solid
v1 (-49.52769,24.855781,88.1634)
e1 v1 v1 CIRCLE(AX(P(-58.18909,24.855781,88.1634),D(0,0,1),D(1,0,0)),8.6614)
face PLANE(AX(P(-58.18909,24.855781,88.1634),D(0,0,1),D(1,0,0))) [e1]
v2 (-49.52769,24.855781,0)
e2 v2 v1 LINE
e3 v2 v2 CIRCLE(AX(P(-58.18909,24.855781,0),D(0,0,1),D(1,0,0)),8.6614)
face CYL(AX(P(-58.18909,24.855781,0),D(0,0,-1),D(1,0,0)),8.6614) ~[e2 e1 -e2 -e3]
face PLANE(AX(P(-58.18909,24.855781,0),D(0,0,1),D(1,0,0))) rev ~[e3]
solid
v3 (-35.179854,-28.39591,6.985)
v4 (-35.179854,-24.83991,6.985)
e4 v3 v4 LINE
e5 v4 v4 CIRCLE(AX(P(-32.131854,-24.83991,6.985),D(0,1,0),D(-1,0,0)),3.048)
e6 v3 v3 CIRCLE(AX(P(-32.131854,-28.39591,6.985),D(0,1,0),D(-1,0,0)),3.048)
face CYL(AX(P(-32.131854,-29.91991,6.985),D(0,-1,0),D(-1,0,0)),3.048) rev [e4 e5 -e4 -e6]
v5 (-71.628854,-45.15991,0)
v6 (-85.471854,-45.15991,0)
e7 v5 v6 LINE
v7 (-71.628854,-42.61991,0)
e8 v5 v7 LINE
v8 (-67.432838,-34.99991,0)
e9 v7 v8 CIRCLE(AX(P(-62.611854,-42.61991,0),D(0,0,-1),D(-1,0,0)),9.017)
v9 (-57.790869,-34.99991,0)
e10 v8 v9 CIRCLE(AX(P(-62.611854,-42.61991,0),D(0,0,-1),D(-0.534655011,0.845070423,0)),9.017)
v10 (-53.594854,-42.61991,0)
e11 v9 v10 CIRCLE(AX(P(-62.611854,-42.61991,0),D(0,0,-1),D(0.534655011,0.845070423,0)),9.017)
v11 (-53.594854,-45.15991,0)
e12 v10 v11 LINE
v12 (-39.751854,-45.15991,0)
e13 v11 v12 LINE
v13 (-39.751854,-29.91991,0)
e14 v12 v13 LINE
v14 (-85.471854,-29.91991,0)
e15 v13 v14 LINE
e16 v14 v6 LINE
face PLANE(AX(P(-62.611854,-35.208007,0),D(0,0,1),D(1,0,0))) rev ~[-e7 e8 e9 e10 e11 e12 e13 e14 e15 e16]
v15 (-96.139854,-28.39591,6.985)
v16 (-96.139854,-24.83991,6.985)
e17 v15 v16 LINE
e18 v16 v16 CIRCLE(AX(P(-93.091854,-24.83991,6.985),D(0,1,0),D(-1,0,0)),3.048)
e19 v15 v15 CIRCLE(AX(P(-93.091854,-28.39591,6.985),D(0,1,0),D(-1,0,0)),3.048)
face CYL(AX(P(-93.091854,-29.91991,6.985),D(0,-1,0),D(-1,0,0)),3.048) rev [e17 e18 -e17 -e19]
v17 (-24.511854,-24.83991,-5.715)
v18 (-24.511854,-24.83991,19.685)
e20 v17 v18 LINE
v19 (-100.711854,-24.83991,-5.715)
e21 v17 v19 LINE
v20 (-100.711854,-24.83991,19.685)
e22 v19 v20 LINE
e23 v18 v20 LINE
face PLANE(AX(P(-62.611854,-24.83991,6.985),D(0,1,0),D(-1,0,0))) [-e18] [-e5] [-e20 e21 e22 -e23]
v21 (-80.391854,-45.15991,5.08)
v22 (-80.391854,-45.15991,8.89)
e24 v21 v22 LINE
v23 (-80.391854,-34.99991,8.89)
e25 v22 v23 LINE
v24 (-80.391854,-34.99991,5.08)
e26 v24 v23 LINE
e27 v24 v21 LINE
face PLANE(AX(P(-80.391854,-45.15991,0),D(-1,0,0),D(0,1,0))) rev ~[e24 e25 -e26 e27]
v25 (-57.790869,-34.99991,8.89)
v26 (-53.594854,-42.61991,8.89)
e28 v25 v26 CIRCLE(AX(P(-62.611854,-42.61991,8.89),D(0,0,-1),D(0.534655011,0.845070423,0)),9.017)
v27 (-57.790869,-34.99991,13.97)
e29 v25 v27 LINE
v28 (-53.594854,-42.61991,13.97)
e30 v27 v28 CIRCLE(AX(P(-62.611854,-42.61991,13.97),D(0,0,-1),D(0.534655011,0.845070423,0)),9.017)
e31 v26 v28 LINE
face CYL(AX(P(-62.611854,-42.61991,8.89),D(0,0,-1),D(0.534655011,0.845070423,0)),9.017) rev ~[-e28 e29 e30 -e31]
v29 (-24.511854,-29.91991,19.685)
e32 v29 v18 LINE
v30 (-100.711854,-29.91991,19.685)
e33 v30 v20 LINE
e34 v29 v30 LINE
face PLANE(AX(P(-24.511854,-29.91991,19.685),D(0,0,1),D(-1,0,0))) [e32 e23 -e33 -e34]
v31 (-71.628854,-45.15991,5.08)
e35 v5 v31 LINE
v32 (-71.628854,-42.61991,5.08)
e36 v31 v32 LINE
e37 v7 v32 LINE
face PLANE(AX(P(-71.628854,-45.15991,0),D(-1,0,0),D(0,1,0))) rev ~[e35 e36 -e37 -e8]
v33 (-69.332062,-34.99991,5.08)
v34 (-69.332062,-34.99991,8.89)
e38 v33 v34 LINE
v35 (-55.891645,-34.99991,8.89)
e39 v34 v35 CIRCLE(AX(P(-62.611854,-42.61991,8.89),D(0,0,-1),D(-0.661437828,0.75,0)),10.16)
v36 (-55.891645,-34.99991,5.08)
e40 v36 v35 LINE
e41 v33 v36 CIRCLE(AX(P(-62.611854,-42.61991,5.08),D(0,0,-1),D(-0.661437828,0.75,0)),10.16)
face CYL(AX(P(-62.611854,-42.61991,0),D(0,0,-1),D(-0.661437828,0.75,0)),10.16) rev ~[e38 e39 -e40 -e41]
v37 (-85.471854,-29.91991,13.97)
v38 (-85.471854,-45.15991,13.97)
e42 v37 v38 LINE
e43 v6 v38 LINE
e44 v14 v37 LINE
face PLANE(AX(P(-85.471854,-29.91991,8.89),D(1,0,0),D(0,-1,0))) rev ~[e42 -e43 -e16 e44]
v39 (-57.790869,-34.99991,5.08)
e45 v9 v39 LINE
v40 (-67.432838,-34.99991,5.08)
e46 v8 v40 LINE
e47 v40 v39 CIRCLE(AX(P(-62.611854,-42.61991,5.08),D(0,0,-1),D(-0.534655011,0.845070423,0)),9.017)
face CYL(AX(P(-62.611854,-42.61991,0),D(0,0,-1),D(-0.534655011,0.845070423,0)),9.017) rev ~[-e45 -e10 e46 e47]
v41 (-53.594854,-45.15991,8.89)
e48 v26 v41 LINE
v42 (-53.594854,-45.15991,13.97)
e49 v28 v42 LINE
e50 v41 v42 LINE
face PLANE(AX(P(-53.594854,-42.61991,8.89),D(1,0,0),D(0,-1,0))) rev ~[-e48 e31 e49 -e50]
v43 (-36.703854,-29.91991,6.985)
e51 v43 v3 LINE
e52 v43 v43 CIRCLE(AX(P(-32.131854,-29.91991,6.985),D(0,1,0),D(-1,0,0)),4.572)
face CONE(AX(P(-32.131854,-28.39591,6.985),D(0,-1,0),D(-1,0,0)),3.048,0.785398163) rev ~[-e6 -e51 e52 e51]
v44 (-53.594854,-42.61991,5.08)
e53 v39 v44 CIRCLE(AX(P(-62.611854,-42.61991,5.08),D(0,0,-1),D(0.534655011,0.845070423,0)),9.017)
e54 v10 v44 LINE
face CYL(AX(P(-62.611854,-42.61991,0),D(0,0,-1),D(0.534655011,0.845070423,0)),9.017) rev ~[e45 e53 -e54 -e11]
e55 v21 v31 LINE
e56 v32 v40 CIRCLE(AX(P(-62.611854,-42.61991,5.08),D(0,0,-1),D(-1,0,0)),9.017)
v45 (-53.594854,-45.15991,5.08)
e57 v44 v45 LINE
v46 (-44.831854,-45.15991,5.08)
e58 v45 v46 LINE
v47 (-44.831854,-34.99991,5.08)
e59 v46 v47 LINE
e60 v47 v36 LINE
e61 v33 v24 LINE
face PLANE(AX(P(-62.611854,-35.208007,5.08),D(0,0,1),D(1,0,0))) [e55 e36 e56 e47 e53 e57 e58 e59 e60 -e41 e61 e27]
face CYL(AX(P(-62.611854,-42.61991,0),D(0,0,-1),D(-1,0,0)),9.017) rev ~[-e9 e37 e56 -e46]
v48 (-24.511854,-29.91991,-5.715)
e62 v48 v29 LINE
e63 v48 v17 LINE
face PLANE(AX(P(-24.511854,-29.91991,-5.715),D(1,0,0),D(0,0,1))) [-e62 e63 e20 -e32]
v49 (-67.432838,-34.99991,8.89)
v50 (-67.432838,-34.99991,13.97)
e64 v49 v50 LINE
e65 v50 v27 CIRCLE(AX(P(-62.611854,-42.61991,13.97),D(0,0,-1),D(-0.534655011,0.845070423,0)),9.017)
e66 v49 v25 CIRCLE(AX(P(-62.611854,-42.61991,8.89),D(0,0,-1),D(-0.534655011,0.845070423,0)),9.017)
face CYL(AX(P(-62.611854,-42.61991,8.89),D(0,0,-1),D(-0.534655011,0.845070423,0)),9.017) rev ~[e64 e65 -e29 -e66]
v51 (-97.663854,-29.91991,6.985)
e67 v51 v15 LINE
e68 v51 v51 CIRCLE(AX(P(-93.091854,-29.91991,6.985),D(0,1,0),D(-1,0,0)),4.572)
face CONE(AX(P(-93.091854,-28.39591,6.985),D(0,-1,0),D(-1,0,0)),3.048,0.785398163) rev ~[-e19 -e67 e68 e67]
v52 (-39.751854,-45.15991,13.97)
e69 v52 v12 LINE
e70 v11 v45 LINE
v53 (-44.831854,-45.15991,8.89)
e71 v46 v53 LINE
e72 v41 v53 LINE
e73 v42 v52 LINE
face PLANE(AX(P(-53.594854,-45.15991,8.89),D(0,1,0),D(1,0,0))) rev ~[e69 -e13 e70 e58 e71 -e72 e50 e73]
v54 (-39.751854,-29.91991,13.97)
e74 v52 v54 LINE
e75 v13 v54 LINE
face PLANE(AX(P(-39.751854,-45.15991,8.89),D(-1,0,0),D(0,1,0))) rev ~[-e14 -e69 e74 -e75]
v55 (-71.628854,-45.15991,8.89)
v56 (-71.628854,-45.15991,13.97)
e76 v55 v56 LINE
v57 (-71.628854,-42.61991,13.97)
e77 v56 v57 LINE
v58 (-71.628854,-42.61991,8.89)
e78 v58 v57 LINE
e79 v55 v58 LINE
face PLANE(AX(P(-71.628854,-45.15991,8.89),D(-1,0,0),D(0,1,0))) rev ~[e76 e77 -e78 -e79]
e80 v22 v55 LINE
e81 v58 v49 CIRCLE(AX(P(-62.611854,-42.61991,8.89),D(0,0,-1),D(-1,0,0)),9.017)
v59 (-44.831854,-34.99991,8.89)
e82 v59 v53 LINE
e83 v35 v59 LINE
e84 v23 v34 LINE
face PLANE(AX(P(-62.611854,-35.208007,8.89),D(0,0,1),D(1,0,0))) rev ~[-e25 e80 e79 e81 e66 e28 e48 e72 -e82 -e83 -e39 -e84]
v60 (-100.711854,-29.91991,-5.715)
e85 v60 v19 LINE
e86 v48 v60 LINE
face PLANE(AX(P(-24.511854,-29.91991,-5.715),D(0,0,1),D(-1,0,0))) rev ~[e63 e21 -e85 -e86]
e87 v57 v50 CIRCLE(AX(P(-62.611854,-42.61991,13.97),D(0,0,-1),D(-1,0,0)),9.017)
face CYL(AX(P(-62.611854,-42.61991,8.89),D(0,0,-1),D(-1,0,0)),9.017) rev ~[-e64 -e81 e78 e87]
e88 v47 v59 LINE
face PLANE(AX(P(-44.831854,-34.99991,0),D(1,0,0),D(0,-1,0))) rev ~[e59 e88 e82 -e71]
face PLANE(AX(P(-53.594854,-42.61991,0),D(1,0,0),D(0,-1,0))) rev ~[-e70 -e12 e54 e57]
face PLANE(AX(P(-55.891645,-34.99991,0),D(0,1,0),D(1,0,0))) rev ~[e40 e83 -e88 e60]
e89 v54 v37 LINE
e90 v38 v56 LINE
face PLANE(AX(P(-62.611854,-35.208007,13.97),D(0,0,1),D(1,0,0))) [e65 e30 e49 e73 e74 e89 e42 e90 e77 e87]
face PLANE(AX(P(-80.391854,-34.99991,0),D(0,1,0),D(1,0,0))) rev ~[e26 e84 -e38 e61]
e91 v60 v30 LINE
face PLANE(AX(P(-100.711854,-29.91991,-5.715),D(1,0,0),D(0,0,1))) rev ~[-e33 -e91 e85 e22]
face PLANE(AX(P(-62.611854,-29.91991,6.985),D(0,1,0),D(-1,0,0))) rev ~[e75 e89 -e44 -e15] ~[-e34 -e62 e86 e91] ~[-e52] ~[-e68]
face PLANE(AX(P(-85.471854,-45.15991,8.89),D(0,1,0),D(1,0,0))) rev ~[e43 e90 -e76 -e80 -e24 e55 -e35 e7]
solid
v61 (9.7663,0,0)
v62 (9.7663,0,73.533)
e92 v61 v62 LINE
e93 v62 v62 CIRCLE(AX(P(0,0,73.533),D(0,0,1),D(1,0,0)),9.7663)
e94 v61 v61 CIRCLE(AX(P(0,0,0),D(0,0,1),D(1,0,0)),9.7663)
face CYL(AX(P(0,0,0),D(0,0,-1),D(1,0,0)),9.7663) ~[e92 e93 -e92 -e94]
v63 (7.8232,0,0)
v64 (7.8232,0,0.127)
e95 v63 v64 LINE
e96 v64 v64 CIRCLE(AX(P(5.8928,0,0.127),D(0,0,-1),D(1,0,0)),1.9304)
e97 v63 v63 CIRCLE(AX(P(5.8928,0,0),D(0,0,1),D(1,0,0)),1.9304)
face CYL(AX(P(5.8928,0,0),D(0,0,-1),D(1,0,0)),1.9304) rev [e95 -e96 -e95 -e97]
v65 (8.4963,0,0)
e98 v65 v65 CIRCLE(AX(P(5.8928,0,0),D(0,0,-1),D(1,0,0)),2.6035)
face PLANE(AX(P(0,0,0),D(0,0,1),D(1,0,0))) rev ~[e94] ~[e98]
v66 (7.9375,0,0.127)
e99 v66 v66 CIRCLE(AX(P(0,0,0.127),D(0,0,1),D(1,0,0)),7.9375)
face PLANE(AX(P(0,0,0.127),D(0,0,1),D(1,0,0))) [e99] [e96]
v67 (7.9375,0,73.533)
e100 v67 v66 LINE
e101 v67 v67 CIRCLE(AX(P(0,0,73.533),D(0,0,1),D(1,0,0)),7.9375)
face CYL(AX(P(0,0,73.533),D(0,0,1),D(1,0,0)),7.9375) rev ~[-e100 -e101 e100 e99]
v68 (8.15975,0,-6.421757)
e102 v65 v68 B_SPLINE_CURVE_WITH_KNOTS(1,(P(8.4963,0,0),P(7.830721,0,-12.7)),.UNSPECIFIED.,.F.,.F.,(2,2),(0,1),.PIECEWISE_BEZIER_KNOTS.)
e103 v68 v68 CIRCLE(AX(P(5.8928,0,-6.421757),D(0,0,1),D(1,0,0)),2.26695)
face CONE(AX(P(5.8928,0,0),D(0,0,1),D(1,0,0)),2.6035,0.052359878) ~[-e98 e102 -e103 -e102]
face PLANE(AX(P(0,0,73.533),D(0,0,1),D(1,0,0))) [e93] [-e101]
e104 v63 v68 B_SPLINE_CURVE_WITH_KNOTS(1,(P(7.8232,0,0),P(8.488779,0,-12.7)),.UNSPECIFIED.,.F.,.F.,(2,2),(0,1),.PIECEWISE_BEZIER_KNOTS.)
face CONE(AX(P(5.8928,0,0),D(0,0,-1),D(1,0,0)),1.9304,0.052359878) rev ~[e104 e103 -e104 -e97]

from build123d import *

# Parameters (mm, degrees)
F0_R      = 9.7663
F0_R_2    = 2.6035
F0_R_3    = 1.9304
F1_DEPTH  = 73.533
F2_R      = 7.9375
F3_DEPTH  = 73.406
F4_DEPTH  = 12.7
F4_TAPER  = 3
F5_DEPTH  = 25.4
F6_R      = 8.6614
F7_DEPTH  = 88.1634
F9_DEPTH  = 5.08
F10_DEPTH = 8.89
F11_START = 8.89
F11_DEPTH = 5.08
F12_W     = 76.2
F12_H     = 25.4
F12_R     = 3.048
F12_W_2   = 45.72
F12_H_2   = 13.97
F13_DEPTH = 5.08
F14_SIZE  = 1.524


# Not quite as in the source:
# - a feature names something its author has since deleted; it is built from what else it names


with BuildPart() as f1:
    # F0 (on Top) → F1 (new body)
    with BuildSketch(Plane.XY):
        Circle(F0_R)
        with Locations((5.8928, 0)):
            Circle(F0_R_2, mode=Mode.SUBTRACT)
        with Locations((5.8928, 0)):
            Circle(F0_R_2)
        with Locations((5.8928, 0)):
            Circle(F0_R_3, mode=Mode.SUBTRACT)
        with Locations((5.8928, 0)):
            Circle(F0_R_3)
    extrude(amount=F1_DEPTH)

    # F2 (on face) → F3 (cut)
    with BuildSketch(Plane.XY.offset(73.533)):
        Circle(F2_R)
    extrude(amount=-F3_DEPTH, mode=Mode.SUBTRACT)

    # F0 (on Top) → F4 (join)
    with BuildSketch(Plane.XY):
        with Locations((5.8928, 0)):
            Circle(F0_R_2)
        with Locations((5.8928, 0)):
            Circle(F0_R_3, mode=Mode.SUBTRACT)
    extrude(amount=-F4_DEPTH, taper=F4_TAPER)

    # F0 (on Top) → F5 (cut)
    with BuildSketch(Plane.XY):
        with Locations((5.8928, 0)):
            Circle(F0_R_3)
    extrude(amount=F5_DEPTH, mode=Mode.SUBTRACT)


with BuildPart() as f7:
    # F6 (on Top) → F7 (new body)
    with BuildSketch(Plane.XY):
        with Locations((-58.1890903413, 24.8557813466)):
            Circle(F6_R)
    extrude(amount=F7_DEPTH)


with BuildPart() as f9:
    # F8 (on Top) → F9 (new body)
    with BuildSketch(Plane.XY):
        with BuildLine():
            ThreePointArc((-69.332061944, -34.9999098742), (-62.6118536139, -32.4599098742), (-55.8916452837, -34.9999098742))
            Line((-55.8916452837, -34.9999098742), (-44.8318536139, -34.9999098742))
            Line((-44.8318536139, -34.9999098742), (-44.8318536139, -45.1599098742))
            Line((-44.8318536139, -45.1599098742), (-39.7518536139, -45.1599098742))
            Line((-39.7518536139, -45.1599098742), (-39.7518536139, -29.9199098742))
            Line((-39.7518536139, -29.9199098742), (-85.4718536139, -29.9199098742))
            Line((-85.4718536139, -29.9199098742), (-85.4718536139, -45.1599098742))
            Line((-85.4718536139, -45.1599098742), (-80.3918536139, -45.1599098742))
            Line((-80.3918536139, -45.1599098742), (-80.3918536139, -34.9999098742))
            Line((-80.3918536139, -34.9999098742), (-69.332061944, -34.9999098742))
        make_face()
        with BuildLine():
            Line((-72.7718536139, -45.1599098742), (-72.4492313132, -45.1599098742))
            ThreePointArc((-72.4492313132, -45.1599098742), (-72.6908753279, -43.9001134858), (-72.7718536139, -42.6199098742))
            Line((-72.7718536139, -42.6199098742), (-72.7718536139, -45.1599098742))
        make_face()
        with BuildLine():
            ThreePointArc((-52.4518536139, -42.6199098742), (-52.5328318998, -43.9001134858), (-52.7744759145, -45.1599098742))
            Line((-52.7744759145, -45.1599098742), (-52.4518536139, -45.1599098742))
            Line((-52.4518536139, -45.1599098742), (-52.4518536139, -42.6199098742))
        make_face()
        with BuildLine():
            ThreePointArc((-72.7718536139, -42.6199098742), (-71.872061944, -38.4397015441), (-69.332061944, -34.9999098742))
            Line((-69.332061944, -34.9999098742), (-80.3918536139, -34.9999098742))
            Line((-80.3918536139, -34.9999098742), (-80.3918536139, -45.1599098742))
            Line((-80.3918536139, -45.1599098742), (-72.7718536139, -45.1599098742))
            Line((-72.7718536139, -45.1599098742), (-72.7718536139, -42.6199098742))
        make_face()
        with BuildLine():
            Line((-44.8318536139, -34.9999098742), (-55.8916452837, -34.9999098742))
            ThreePointArc((-55.8916452837, -34.9999098742), (-53.3516452837, -38.4397015441), (-52.4518536139, -42.6199098742))
            Line((-52.4518536139, -42.6199098742), (-52.4518536139, -45.1599098742))
            Line((-52.4518536139, -45.1599098742), (-44.8318536139, -45.1599098742))
            Line((-44.8318536139, -45.1599098742), (-44.8318536139, -34.9999098742))
        make_face()
        with BuildLine():
            ThreePointArc((-67.4328378495, -34.9999098742), (-62.6118536139, -33.6029098742), (-57.7908693782, -34.9999098742))
            Line((-57.7908693782, -34.9999098742), (-55.8916452837, -34.9999098742))
            ThreePointArc((-55.8916452837, -34.9999098742), (-62.6118536139, -32.4599098742), (-69.332061944, -34.9999098742))
            Line((-69.332061944, -34.9999098742), (-67.4328378495, -34.9999098742))
        make_face()
        with BuildLine():
            Line((-71.6288536139, -45.1599098742), (-71.6288536139, -42.6199098742))
            ThreePointArc((-71.6288536139, -42.6199098742), (-70.5104960242, -38.2704573714), (-67.4328378495, -34.9999098742))
            Line((-67.4328378495, -34.9999098742), (-69.332061944, -34.9999098742))
            ThreePointArc((-69.332061944, -34.9999098742), (-71.872061944, -38.4397015441), (-72.7718536139, -42.6199098742))
            ThreePointArc((-72.7718536139, -42.6199098742), (-72.6908753279, -43.9001134858), (-72.4492313132, -45.1599098742))
            Line((-72.4492313132, -45.1599098742), (-71.6288536139, -45.1599098742))
        make_face()
        with BuildLine():
            ThreePointArc((-57.7908693782, -34.9999098742), (-54.7132112035, -38.2704573714), (-53.5948536139, -42.6199098742))
            Line((-53.5948536139, -42.6199098742), (-53.5948536139, -45.1599098742))
            Line((-53.5948536139, -45.1599098742), (-52.7744759145, -45.1599098742))
            ThreePointArc((-52.7744759145, -45.1599098742), (-52.5328318998, -43.9001134858), (-52.4518536139, -42.6199098742))
            ThreePointArc((-52.4518536139, -42.6199098742), (-53.3516452837, -38.4397015441), (-55.8916452837, -34.9999098742))
            Line((-55.8916452837, -34.9999098742), (-57.7908693782, -34.9999098742))
        make_face()
    extrude(amount=F9_DEPTH)

    # F8 (on Top) → F10 (join)
    with BuildSketch(Plane.XY):
        with BuildLine():
            ThreePointArc((-69.332061944, -34.9999098742), (-62.6118536139, -32.4599098742), (-55.8916452837, -34.9999098742))
            Line((-55.8916452837, -34.9999098742), (-44.8318536139, -34.9999098742))
            Line((-44.8318536139, -34.9999098742), (-44.8318536139, -45.1599098742))
            Line((-44.8318536139, -45.1599098742), (-39.7518536139, -45.1599098742))
            Line((-39.7518536139, -45.1599098742), (-39.7518536139, -29.9199098742))
            Line((-39.7518536139, -29.9199098742), (-85.4718536139, -29.9199098742))
            Line((-85.4718536139, -29.9199098742), (-85.4718536139, -45.1599098742))
            Line((-85.4718536139, -45.1599098742), (-80.3918536139, -45.1599098742))
            Line((-80.3918536139, -45.1599098742), (-80.3918536139, -34.9999098742))
            Line((-80.3918536139, -34.9999098742), (-69.332061944, -34.9999098742))
        make_face()
    extrude(amount=F10_DEPTH)

    # F8 (on Top) → F11 (join)
    with BuildSketch(Plane.XY.offset(F11_START)):
        with BuildLine():
            ThreePointArc((-69.332061944, -34.9999098742), (-62.6118536139, -32.4599098742), (-55.8916452837, -34.9999098742))
            Line((-55.8916452837, -34.9999098742), (-44.8318536139, -34.9999098742))
            Line((-44.8318536139, -34.9999098742), (-44.8318536139, -45.1599098742))
            Line((-44.8318536139, -45.1599098742), (-39.7518536139, -45.1599098742))
            Line((-39.7518536139, -45.1599098742), (-39.7518536139, -29.9199098742))
            Line((-39.7518536139, -29.9199098742), (-85.4718536139, -29.9199098742))
            Line((-85.4718536139, -29.9199098742), (-85.4718536139, -45.1599098742))
            Line((-85.4718536139, -45.1599098742), (-80.3918536139, -45.1599098742))
            Line((-80.3918536139, -45.1599098742), (-80.3918536139, -34.9999098742))
            Line((-80.3918536139, -34.9999098742), (-69.332061944, -34.9999098742))
        make_face()
        with BuildLine():
            Line((-44.8318536139, -34.9999098742), (-55.8916452837, -34.9999098742))
            ThreePointArc((-55.8916452837, -34.9999098742), (-53.3516452837, -38.4397015441), (-52.4518536139, -42.6199098742))
            Line((-52.4518536139, -42.6199098742), (-52.4518536139, -45.1599098742))
            Line((-52.4518536139, -45.1599098742), (-44.8318536139, -45.1599098742))
            Line((-44.8318536139, -45.1599098742), (-44.8318536139, -34.9999098742))
        make_face()
        with BuildLine():
            ThreePointArc((-67.4328378495, -34.9999098742), (-62.6118536139, -33.6029098742), (-57.7908693782, -34.9999098742))
            Line((-57.7908693782, -34.9999098742), (-55.8916452837, -34.9999098742))
            ThreePointArc((-55.8916452837, -34.9999098742), (-62.6118536139, -32.4599098742), (-69.332061944, -34.9999098742))
            Line((-69.332061944, -34.9999098742), (-67.4328378495, -34.9999098742))
        make_face()
        with BuildLine():
            ThreePointArc((-72.7718536139, -42.6199098742), (-71.872061944, -38.4397015441), (-69.332061944, -34.9999098742))
            Line((-69.332061944, -34.9999098742), (-80.3918536139, -34.9999098742))
            Line((-80.3918536139, -34.9999098742), (-80.3918536139, -45.1599098742))
            Line((-80.3918536139, -45.1599098742), (-72.7718536139, -45.1599098742))
            Line((-72.7718536139, -45.1599098742), (-72.7718536139, -42.6199098742))
        make_face()
        with BuildLine():
            Line((-72.7718536139, -45.1599098742), (-72.4492313132, -45.1599098742))
            ThreePointArc((-72.4492313132, -45.1599098742), (-72.6908753279, -43.9001134858), (-72.7718536139, -42.6199098742))
            Line((-72.7718536139, -42.6199098742), (-72.7718536139, -45.1599098742))
        make_face()
        with BuildLine():
            ThreePointArc((-52.4518536139, -42.6199098742), (-52.5328318998, -43.9001134858), (-52.7744759145, -45.1599098742))
            Line((-52.7744759145, -45.1599098742), (-52.4518536139, -45.1599098742))
            Line((-52.4518536139, -45.1599098742), (-52.4518536139, -42.6199098742))
        make_face()
        with BuildLine():
            Line((-71.6288536139, -45.1599098742), (-71.6288536139, -42.6199098742))
            ThreePointArc((-71.6288536139, -42.6199098742), (-70.5104960242, -38.2704573714), (-67.4328378495, -34.9999098742))
            Line((-67.4328378495, -34.9999098742), (-69.332061944, -34.9999098742))
            ThreePointArc((-69.332061944, -34.9999098742), (-71.872061944, -38.4397015441), (-72.7718536139, -42.6199098742))
            ThreePointArc((-72.7718536139, -42.6199098742), (-72.6908753279, -43.9001134858), (-72.4492313132, -45.1599098742))
            Line((-72.4492313132, -45.1599098742), (-71.6288536139, -45.1599098742))
        make_face()
        with BuildLine():
            ThreePointArc((-57.7908693782, -34.9999098742), (-54.7132112035, -38.2704573714), (-53.5948536139, -42.6199098742))
            Line((-53.5948536139, -42.6199098742), (-53.5948536139, -45.1599098742))
            Line((-53.5948536139, -45.1599098742), (-52.7744759145, -45.1599098742))
            ThreePointArc((-52.7744759145, -45.1599098742), (-52.5328318998, -43.9001134858), (-52.4518536139, -42.6199098742))
            ThreePointArc((-52.4518536139, -42.6199098742), (-53.3516452837, -38.4397015441), (-55.8916452837, -34.9999098742))
            Line((-55.8916452837, -34.9999098742), (-57.7908693782, -34.9999098742))
        make_face()
    extrude(amount=F11_DEPTH)

    # F12 (on face) → F13 (join)
    with BuildSketch(Plane(origin=(0, -29.9199098742, 0), x_dir=(-1, 0, 0), z_dir=(0, 1, 0))):
        with Locations((62.6118536139, 6.985)):
            Rectangle(F12_W, F12_H)
        with Locations((32.1318536139, 6.985)):
            Circle(F12_R, mode=Mode.SUBTRACT)
        with Locations((62.6118536139, 6.985)):
            Rectangle(F12_W_2, F12_H_2, mode=Mode.SUBTRACT)
        with Locations((93.0918536139, 6.985)):
            Circle(F12_R, mode=Mode.SUBTRACT)
        with Locations((62.6118536139, 6.985)):
            Rectangle(F12_W_2, F12_H_2)
    extrude(amount=F13_DEPTH)

    # F14
    f14_edges = [f9.edges().sort_by_distance(p)[0] for p in [
        (-90.043854, -29.91991, 6.985),
        (-29.083854, -29.91991, 6.985),
    ]]
    chamfer(f14_edges, length=F14_SIZE)


solid = Compound([f1.part, f7.part, f9.part])
